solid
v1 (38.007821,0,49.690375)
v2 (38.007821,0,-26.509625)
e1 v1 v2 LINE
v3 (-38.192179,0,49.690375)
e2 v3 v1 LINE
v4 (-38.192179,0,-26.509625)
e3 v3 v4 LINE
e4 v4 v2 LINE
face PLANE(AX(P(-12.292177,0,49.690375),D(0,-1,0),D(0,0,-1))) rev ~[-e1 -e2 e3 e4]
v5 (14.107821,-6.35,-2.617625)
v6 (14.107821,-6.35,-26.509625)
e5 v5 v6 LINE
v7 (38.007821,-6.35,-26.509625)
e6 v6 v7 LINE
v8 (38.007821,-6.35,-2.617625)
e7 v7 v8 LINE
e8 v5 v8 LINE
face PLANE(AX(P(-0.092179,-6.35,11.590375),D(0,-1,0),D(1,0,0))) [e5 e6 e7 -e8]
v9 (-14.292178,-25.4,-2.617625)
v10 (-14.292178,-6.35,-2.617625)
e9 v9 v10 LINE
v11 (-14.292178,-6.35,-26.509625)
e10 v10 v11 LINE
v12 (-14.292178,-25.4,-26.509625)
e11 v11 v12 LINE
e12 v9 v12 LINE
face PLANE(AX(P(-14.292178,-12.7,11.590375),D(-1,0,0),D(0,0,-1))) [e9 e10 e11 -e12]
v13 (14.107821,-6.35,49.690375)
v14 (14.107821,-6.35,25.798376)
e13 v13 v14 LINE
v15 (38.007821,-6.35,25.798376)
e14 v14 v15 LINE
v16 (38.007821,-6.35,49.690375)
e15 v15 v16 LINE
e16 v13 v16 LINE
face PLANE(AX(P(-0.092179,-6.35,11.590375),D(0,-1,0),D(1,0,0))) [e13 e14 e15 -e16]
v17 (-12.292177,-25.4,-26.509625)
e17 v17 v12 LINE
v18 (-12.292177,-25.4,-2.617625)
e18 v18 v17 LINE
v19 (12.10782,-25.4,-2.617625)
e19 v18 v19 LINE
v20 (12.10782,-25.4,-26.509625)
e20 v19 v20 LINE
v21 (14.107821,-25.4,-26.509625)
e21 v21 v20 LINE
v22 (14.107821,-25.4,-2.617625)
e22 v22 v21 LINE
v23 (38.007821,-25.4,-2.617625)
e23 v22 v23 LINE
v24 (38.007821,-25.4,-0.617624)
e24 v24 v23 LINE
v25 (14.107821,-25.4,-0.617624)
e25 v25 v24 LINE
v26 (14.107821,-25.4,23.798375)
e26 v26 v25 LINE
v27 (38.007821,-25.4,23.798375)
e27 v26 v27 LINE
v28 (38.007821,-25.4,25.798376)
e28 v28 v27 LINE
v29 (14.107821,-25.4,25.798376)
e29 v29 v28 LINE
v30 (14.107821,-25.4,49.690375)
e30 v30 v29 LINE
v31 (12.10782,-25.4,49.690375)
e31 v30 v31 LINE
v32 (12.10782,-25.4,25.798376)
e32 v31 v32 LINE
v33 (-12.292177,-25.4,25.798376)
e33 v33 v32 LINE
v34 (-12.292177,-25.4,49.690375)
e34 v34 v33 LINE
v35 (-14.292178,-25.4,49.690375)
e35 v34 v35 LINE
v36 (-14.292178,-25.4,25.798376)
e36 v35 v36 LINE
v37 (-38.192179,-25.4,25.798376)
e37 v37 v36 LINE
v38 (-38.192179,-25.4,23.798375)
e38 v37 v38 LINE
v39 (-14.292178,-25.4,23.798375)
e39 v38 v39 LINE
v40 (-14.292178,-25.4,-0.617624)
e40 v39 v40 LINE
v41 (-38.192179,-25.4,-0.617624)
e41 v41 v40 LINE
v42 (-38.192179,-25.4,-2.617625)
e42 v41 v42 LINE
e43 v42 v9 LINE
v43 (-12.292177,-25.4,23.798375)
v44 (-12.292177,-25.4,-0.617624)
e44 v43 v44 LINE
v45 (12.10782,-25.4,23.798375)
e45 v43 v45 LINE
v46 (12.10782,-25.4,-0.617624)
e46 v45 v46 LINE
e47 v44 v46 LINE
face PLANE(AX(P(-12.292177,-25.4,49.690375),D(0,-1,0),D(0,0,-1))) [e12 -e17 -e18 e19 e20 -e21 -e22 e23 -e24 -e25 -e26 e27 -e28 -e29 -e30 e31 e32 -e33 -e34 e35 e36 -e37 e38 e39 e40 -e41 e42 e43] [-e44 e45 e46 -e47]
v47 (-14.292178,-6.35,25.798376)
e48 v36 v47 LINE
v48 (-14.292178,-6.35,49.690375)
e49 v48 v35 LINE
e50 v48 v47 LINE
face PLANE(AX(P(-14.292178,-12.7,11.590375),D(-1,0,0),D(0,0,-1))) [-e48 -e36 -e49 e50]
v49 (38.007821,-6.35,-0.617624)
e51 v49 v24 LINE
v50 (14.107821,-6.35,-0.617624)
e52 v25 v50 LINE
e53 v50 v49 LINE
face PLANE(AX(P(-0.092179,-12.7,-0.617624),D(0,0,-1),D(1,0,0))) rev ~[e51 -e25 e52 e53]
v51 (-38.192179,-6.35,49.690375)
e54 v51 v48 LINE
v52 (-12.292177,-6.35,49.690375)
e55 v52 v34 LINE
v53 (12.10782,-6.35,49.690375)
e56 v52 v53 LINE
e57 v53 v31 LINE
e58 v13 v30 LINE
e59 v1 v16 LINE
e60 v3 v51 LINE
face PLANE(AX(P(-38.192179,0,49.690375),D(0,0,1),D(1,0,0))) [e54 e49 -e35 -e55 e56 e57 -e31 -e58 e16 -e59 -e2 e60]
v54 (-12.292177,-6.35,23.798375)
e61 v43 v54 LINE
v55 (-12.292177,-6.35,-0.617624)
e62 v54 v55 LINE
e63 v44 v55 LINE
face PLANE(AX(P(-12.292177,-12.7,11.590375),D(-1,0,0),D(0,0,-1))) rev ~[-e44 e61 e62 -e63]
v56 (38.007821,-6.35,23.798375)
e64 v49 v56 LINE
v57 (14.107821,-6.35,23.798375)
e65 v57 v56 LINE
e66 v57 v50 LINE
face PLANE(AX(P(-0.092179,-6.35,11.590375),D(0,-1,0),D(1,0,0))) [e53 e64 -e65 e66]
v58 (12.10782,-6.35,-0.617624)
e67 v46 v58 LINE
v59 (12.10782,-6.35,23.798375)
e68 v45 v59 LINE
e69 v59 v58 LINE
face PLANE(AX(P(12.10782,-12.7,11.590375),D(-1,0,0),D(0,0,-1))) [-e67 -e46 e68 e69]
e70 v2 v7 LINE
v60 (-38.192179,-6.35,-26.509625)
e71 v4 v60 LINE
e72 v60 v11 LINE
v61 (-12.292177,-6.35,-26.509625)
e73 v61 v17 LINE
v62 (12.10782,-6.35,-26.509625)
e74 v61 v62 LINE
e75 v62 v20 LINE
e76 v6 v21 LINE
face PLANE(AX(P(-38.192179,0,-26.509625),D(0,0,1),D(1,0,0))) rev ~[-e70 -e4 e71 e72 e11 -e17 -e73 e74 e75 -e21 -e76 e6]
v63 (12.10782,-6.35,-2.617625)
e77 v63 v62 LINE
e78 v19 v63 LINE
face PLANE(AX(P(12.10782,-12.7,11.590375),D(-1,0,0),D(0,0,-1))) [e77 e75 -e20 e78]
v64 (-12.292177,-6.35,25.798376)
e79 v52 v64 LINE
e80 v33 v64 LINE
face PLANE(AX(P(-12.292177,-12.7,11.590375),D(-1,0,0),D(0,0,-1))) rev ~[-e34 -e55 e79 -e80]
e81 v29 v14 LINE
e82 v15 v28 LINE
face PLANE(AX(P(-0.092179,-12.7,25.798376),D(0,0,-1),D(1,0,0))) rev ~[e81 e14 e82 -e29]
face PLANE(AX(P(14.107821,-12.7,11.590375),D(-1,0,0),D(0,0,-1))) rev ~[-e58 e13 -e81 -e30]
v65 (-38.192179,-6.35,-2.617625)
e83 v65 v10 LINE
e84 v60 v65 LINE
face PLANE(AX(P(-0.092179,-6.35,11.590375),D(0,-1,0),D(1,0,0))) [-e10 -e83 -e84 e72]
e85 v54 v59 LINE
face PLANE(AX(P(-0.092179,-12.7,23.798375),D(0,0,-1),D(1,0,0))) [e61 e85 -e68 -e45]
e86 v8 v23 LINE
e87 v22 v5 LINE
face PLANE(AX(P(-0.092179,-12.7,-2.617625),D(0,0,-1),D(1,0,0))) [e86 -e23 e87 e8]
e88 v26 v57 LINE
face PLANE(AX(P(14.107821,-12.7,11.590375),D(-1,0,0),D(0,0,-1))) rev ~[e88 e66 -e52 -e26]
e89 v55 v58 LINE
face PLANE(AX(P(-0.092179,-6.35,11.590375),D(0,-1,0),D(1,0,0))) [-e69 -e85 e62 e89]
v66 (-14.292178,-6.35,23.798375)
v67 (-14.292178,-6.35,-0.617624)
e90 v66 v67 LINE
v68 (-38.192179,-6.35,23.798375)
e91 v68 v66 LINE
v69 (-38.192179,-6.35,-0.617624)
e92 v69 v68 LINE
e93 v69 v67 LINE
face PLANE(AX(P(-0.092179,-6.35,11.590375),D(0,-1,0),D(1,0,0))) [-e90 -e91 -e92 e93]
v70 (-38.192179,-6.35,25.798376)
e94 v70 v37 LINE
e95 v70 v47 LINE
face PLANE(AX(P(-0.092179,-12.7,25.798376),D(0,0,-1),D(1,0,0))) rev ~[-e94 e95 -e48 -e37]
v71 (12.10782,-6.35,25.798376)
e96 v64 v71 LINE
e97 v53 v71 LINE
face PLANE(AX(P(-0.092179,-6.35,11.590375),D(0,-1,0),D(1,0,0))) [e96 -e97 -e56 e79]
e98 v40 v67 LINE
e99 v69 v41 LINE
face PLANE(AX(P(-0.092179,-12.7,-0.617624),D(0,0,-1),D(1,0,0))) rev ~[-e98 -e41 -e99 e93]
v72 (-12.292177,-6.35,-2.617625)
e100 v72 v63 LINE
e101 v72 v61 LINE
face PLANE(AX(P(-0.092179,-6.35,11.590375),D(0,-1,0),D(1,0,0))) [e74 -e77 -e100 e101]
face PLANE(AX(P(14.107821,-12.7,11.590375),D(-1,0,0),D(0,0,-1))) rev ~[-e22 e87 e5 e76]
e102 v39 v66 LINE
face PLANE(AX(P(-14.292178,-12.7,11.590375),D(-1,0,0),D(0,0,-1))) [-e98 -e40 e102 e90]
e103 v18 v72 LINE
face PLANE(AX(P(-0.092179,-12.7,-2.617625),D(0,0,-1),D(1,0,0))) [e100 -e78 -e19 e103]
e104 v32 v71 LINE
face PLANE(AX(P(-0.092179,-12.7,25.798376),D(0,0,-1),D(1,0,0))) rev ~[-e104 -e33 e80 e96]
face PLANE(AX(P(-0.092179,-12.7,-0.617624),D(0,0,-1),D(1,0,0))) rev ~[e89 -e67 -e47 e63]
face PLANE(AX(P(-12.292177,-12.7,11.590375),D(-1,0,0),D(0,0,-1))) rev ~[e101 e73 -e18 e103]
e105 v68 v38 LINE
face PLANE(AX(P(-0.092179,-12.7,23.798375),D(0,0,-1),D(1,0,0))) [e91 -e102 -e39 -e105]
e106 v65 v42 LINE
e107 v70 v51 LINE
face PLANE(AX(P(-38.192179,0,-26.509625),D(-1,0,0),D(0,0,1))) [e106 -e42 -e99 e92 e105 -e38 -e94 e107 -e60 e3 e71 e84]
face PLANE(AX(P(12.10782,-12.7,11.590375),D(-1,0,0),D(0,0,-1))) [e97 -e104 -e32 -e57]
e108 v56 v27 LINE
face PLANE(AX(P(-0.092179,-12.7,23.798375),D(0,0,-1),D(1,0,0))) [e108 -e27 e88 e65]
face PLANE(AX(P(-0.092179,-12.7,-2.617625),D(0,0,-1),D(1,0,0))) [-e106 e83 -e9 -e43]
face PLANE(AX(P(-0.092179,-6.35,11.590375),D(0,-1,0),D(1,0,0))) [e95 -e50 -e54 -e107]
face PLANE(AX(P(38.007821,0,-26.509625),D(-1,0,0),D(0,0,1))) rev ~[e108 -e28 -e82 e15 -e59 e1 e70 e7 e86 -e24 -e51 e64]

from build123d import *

# Parameters (mm, degrees)
F0_W     = 76.2
F0_H     = 76.2
F3_DEPTH = 6.35
F6_E7_W  = 76.2
F6_E7_H  = 25.4
F7_DEPTH = 2.00000108
F6_E9_W  = 76.2
F6_E9_H  = 25.4
F8_DEPTH = 2.00000108
F5_E11_W = 76.2
F5_E11_H = 25.4
F5_E5_W  = 76.2
F5_E5_H  = 25.4
F9_DEPTH = 2.00000108


# Not quite as in the source:
# - the program builds the solid bodies; features that only make, move or delete a surface that nothing else refers to are left out


with BuildPart() as f3:
    # F0 (on Front) → F3 (new body)
    with BuildSketch(Plane.XZ):
        with Locations((-0.0921785831, 11.5903750752)):
            Rectangle(F0_W, F0_H)
    extrude(amount=F3_DEPTH)

    # F6_E7 (on explicit) → F7 (join)
    with BuildSketch(Plane(origin=(-38.1921785831, 0, 25.7983756152), x_dir=(1, 0, 0), z_dir=(0, 0, -1))):
        with Locations((38.1, 12.7)):
            Rectangle(F6_E7_W, F6_E7_H)
    extrude(amount=F7_DEPTH)

    # F6_E9 (on explicit) → F8 (join)
    with BuildSketch(Plane(origin=(-38.1921785831, 0, -0.6176243848), x_dir=(1, 0, 0), z_dir=(0, 0, -1))):
        with Locations((38.1, 12.7)):
            Rectangle(F6_E9_W, F6_E9_H)
    extrude(amount=F8_DEPTH)

    # F5_E11 (on explicit) + F5_E5 (on explicit) → F9 (join)
    with BuildSketch(Plane(origin=(-12.2921770431, 0, 49.6903750752), x_dir=(0, 0, -1), z_dir=(-1, 0, 0))):
        with Locations((38.1, 12.7)):
            Rectangle(F5_E11_W, F5_E11_H)
    with BuildSketch(Plane(origin=(14.1078209569, 0, 49.6903750752), x_dir=(0, 0, -1), z_dir=(-1, 0, 0))):
        with Locations((38.1, 12.7)):
            Rectangle(F5_E5_W, F5_E5_H)
    extrude(amount=F9_DEPTH)


solid = f3.part
